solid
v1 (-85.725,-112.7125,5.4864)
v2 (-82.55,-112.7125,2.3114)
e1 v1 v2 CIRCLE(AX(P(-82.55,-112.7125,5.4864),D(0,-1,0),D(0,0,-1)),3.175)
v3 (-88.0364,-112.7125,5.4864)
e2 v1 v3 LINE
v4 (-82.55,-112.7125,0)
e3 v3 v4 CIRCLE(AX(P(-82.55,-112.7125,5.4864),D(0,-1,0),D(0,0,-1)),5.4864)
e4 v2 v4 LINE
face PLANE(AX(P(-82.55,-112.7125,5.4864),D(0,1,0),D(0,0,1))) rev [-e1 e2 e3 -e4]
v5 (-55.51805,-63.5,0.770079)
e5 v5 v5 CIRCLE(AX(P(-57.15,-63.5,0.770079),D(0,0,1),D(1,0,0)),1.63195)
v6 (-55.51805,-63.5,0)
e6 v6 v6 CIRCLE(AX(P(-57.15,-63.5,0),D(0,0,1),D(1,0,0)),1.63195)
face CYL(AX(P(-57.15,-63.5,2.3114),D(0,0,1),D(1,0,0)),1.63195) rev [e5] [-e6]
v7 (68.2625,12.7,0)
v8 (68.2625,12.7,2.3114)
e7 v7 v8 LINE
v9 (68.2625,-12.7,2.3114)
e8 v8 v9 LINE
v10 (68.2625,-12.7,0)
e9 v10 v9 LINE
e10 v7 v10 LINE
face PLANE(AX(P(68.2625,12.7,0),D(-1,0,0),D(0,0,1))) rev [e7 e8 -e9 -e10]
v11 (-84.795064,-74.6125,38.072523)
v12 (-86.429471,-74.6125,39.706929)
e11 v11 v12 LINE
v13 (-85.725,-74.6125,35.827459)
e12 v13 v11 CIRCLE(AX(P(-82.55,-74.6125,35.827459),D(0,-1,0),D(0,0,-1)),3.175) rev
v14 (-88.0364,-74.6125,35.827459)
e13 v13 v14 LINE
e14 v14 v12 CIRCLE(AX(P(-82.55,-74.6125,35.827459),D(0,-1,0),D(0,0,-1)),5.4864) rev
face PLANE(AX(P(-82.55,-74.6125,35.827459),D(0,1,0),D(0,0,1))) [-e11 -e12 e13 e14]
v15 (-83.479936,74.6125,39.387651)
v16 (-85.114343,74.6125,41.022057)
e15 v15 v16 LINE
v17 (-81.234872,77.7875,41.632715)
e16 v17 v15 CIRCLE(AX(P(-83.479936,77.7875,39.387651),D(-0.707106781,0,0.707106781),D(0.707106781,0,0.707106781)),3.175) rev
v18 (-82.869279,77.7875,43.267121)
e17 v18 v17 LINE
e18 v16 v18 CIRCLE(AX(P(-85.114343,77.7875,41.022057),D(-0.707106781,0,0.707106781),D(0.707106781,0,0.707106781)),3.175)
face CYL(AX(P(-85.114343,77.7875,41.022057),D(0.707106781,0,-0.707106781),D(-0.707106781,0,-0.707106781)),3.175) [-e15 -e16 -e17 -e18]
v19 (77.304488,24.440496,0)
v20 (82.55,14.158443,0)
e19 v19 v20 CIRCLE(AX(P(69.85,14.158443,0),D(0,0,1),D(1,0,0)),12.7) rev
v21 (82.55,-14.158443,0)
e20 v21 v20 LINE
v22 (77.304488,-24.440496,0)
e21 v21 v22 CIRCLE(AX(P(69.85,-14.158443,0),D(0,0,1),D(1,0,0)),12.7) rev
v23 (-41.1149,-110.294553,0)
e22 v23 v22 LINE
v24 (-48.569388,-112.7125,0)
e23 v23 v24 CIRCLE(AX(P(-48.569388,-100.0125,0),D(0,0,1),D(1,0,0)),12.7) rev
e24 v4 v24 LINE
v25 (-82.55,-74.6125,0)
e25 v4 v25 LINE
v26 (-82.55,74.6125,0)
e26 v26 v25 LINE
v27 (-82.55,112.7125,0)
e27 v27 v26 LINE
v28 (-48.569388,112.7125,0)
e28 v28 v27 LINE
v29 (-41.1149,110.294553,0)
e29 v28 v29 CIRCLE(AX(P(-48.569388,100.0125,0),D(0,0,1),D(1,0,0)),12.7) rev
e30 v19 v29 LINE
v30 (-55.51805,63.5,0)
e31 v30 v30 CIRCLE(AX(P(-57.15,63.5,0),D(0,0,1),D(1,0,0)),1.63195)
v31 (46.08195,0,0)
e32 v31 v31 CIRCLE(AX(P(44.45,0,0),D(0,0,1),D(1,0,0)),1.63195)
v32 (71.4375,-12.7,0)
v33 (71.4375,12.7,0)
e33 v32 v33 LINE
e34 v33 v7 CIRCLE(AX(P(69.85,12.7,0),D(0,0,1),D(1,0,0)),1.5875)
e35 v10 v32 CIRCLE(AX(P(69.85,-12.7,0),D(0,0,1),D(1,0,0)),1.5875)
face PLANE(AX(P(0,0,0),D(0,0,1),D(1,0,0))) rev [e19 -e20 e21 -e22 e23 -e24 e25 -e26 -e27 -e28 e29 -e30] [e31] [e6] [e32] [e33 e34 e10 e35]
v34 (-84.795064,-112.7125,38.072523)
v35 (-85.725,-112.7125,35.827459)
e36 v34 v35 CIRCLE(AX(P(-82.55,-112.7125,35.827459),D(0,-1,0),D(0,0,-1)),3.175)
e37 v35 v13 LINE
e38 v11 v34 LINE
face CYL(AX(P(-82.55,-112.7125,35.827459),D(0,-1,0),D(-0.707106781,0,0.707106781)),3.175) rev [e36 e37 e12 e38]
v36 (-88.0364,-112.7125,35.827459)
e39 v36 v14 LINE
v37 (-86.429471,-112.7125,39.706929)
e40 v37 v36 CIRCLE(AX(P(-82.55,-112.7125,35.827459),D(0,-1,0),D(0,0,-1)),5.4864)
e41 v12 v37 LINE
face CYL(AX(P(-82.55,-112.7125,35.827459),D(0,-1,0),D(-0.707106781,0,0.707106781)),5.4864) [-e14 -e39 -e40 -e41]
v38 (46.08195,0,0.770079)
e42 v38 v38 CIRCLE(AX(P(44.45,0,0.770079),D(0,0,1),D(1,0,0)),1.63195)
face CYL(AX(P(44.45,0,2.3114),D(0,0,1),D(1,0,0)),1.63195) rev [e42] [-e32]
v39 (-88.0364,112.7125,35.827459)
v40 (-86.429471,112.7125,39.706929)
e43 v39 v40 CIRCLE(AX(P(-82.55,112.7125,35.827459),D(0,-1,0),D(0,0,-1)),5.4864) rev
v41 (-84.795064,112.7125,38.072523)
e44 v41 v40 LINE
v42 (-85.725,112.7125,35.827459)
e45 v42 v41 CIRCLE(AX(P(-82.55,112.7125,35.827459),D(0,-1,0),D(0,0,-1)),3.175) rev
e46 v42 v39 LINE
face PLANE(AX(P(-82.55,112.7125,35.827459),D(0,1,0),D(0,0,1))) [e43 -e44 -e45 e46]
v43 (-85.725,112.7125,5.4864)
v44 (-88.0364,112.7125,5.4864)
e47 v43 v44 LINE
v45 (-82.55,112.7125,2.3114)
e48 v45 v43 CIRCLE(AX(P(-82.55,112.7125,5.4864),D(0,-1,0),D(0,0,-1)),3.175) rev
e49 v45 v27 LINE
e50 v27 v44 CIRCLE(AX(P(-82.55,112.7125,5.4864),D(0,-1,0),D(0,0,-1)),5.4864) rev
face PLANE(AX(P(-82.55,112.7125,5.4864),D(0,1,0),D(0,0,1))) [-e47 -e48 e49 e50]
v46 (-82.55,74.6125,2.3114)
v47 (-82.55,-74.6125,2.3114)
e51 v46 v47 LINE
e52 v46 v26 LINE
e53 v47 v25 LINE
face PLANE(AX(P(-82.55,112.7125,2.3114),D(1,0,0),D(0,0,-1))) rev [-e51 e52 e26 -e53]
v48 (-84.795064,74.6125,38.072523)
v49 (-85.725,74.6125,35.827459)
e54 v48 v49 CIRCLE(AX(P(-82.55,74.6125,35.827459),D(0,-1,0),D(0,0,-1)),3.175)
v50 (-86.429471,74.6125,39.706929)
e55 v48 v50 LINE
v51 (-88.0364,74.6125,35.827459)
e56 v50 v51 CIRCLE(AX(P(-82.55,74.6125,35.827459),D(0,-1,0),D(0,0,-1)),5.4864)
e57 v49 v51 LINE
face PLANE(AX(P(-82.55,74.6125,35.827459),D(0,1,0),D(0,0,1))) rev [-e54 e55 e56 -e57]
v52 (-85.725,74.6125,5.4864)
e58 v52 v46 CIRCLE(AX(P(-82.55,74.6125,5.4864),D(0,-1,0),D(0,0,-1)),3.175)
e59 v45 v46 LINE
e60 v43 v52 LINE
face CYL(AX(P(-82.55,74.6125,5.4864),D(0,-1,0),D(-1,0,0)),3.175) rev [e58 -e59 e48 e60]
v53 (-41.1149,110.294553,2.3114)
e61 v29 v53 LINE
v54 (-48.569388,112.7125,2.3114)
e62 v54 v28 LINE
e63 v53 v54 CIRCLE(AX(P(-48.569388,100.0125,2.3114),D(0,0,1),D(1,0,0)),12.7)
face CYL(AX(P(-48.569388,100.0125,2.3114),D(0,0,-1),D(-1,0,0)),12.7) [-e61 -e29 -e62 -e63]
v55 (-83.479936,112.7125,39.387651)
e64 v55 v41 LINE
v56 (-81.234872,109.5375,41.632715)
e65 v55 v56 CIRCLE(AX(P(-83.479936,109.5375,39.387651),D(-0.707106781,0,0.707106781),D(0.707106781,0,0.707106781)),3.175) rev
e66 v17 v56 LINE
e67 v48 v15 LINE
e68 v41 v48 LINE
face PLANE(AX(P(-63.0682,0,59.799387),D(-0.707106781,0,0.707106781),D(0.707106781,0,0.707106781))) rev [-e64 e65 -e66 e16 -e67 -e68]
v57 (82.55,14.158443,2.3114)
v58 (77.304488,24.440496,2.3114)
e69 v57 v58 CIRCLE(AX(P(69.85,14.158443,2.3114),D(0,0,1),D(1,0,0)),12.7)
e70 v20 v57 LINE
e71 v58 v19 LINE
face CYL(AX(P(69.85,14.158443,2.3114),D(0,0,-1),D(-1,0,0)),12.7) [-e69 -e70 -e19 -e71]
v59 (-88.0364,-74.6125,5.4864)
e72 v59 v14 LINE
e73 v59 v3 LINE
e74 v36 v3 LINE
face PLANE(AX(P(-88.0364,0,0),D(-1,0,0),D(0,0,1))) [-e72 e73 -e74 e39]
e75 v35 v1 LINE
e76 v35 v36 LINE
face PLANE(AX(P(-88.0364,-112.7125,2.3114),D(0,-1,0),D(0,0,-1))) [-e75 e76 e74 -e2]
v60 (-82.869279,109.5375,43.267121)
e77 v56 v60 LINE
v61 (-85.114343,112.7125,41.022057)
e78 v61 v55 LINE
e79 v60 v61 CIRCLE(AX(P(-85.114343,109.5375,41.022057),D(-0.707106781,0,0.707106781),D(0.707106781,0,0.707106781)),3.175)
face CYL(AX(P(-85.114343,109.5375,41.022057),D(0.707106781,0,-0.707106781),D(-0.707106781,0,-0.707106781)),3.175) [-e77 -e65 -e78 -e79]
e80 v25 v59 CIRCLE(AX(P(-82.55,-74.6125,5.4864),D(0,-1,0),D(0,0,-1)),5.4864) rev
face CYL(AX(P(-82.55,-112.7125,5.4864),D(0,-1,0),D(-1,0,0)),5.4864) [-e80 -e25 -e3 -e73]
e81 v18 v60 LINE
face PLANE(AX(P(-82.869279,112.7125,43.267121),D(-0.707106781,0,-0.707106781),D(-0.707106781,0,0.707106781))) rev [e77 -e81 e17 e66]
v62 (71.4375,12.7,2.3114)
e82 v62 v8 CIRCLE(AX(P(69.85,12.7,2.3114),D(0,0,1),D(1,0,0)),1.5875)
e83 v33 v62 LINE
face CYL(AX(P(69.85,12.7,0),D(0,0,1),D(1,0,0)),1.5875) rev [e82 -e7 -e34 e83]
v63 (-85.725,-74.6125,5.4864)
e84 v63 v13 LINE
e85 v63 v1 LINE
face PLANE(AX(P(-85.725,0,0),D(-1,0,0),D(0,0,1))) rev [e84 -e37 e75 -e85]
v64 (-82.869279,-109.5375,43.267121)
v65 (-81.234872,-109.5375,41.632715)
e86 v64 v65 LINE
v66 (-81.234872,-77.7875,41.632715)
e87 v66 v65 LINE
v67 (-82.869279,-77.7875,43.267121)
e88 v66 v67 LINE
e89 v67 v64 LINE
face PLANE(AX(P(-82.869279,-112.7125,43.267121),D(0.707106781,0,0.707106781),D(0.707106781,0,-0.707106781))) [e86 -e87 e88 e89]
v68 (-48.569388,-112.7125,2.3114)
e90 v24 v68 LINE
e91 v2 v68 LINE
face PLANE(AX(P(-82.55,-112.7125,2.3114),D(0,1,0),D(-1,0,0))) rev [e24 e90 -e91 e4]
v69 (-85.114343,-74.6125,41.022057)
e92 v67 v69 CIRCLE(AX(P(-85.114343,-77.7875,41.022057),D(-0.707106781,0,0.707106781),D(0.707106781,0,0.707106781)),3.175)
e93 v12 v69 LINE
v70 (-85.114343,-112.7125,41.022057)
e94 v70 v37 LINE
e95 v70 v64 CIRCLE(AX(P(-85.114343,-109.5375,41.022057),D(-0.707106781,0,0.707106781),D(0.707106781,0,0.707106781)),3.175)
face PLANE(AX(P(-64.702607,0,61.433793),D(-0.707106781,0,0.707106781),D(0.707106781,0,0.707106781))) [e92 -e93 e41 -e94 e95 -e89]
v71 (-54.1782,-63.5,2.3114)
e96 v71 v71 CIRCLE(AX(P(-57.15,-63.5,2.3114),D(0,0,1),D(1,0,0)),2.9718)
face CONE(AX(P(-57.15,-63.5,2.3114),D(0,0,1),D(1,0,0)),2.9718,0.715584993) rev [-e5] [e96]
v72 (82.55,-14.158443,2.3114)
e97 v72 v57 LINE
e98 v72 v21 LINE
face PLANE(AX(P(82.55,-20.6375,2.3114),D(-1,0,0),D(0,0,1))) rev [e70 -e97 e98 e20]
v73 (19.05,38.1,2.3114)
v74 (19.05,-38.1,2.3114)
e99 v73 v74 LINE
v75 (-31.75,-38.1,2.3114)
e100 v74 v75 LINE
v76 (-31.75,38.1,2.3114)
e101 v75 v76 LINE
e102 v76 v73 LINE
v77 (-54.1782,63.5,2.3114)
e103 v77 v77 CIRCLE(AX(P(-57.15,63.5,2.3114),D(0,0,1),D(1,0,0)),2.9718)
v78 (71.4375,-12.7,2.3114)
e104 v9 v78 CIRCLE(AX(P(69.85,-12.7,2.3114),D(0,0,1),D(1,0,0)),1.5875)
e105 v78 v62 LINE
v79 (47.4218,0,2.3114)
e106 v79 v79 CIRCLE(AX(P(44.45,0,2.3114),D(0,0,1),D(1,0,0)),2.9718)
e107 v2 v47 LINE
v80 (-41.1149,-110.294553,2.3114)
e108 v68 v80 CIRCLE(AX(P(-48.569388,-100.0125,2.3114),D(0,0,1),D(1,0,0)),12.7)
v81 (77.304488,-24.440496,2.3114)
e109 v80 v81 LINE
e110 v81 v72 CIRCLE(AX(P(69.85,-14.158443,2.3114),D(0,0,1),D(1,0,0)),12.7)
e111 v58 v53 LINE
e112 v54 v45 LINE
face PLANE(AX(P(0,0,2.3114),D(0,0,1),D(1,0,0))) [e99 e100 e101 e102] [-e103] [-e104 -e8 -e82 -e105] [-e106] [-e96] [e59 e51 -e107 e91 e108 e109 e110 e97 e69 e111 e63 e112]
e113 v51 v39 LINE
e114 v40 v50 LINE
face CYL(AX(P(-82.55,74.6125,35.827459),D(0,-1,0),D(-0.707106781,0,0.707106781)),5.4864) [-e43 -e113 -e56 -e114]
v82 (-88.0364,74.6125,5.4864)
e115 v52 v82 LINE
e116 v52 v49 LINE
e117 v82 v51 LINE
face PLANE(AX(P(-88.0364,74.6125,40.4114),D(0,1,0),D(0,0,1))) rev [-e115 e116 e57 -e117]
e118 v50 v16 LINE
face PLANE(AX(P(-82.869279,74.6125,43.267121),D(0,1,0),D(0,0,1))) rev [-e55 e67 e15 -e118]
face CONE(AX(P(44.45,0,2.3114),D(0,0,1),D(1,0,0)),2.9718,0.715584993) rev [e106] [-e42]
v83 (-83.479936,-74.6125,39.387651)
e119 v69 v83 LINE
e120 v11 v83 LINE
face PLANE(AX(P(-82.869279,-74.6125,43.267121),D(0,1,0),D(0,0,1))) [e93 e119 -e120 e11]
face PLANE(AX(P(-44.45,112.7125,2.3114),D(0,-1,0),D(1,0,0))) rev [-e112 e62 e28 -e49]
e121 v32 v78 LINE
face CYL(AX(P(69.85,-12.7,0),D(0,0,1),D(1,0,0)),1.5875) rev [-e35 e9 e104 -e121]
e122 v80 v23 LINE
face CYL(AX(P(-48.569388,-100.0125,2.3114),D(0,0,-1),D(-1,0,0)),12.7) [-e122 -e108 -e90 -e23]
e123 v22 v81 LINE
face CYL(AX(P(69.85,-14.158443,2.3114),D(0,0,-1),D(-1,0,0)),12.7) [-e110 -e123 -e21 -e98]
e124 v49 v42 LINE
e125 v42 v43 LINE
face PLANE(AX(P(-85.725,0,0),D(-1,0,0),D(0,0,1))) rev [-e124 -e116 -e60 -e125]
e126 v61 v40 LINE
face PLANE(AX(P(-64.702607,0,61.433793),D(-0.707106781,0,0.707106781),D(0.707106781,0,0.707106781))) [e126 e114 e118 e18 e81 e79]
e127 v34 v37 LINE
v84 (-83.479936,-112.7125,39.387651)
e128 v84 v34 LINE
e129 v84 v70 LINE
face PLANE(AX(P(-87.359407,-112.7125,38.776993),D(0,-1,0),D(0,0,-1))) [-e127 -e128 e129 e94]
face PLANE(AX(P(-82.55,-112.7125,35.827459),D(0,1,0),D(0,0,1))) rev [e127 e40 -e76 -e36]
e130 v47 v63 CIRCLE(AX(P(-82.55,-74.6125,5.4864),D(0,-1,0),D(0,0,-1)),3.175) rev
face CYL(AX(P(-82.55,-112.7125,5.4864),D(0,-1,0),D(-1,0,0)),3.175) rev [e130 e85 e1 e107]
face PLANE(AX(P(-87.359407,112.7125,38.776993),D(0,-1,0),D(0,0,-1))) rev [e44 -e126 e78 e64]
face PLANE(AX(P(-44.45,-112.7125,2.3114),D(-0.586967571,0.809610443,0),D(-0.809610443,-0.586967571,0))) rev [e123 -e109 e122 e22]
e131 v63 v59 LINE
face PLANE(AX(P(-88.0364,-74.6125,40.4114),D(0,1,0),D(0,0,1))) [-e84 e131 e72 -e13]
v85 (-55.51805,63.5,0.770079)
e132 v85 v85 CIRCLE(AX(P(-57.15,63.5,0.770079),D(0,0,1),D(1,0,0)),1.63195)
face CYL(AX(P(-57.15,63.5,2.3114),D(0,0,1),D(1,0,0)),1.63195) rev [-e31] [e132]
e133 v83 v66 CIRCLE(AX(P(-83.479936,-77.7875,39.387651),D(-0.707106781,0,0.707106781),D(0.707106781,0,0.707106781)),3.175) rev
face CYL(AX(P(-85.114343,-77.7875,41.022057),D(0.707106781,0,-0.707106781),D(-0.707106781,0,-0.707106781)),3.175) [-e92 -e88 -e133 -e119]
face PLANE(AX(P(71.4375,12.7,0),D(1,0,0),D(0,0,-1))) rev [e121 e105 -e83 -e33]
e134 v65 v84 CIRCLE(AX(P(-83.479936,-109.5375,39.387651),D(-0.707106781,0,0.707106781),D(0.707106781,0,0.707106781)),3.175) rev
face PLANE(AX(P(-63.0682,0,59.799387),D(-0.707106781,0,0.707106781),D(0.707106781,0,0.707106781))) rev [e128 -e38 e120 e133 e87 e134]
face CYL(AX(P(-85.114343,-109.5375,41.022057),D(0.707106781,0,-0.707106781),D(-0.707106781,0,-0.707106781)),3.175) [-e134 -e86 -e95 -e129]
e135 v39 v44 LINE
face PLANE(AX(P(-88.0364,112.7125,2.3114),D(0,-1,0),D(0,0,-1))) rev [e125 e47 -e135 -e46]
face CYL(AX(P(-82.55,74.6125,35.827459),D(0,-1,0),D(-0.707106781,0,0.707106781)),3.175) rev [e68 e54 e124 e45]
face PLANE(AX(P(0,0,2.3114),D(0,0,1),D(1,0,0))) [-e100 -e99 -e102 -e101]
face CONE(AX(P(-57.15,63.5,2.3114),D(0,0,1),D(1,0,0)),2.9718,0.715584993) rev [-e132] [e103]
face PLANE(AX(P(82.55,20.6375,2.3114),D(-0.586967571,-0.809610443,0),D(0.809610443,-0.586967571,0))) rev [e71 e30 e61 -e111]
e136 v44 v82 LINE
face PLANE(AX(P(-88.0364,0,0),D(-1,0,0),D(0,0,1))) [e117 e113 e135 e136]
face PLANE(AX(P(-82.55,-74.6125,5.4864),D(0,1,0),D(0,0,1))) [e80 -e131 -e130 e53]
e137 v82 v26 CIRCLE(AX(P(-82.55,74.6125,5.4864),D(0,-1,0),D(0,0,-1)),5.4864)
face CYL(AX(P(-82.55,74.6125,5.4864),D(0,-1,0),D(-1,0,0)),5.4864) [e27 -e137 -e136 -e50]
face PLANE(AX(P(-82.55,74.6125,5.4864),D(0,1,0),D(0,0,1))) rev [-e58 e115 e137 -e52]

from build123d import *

# Parameters (mm, degrees)
BASE_FLANGE1_DEPTH                    = 2.3114
EDGE_FLANGE2_DEPTH                    = 38.1
EDGE_FLANGE3_START                    = -112.7125
EDGE_FLANGE3_DEPTH                    = 38.1
EDGE_FLANGE3_2_DEPTH                  = 38.1
CUT_EXTRUDE1_DEPTH                    = 149.767894723
CUT_EXTRUDE1_DEPTH_BACK               = 149.767894723
BREAK_CORNER1_START                   = -89.191903794
BREAK_CORNER1_DEPTH                   = 2.3114
BREAK_CORNER2_DEPTH                   = 2.3114
F_30_0_1285_DIAMETER_HOLE1_AT_2_COUNT = 2
F_30_0_1285_DIAMETER_HOLE1_AT_2_PITCH = 127
F_30_0_1285_DIAMETER_HOLE1_AT_3_COUNT = 2
F_30_0_1285_DIAMETER_HOLE1_AT_3_PITCH = 119.811560377


# Read off the part's stored shape, not the designer's step: Edge-Flange3, Break-Corner1, Break-Corner2
# Sheet-metal steps are written as plain solids
with BuildPart() as part:
    # Sketch1 → Base-Flange1 (new body)
    with BuildSketch(Plane.XY):
        Polygon((-82.55, 112.7125), (-82.55, -112.7125), (-44.45, -112.7125), (82.55, -20.6375), (82.55, 20.6375), (-44.45, 112.7125), align=None)
    extrude(amount=BASE_FLANGE1_DEPTH)

    # Edge-Flange2 section (across the edge) → Edge-Flange2 (add)
    with BuildSketch(Plane(origin=(-85.725, -74.6125, 2.3114), x_dir=(1, 0, 0), z_dir=(0, -1, 0))):
        with BuildLine():
            Line((-2.3114, 3.175), (-2.3114, 38.1))
            Line((-2.3114, 38.1), (0, 38.1))
            Line((0, 38.1), (0, 3.175))
            ThreePointArc((0, 3.175), (0.92993597, 0.92993597), (3.175, 0))
            Line((3.175, 0), (3.175, -2.3114))
            ThreePointArc((3.175, -2.3114), (-0.704470644, -0.704470644), (-2.3114, 3.175))
        make_face()
    edge_flange2 = extrude(amount=EDGE_FLANGE2_DEPTH)

    # Mirror1: Edge-Flange2 across plane
    add(edge_flange2.mirror(Plane.ZX))

    # Edge-Flange3 outline → Edge-Flange3 (cut)
    with BuildSketch(Plane(origin=(0, 0, 0), x_dir=(1, 0, 0), z_dir=(0, 1, 0)).offset(EDGE_FLANGE3_START)):
        with BuildLine():
            Line((-85.725, -40.4114), (-86.429470644, -39.706929356))
            ThreePointArc((-86.429470644, -39.706929356), (-87.618772667, -37.927013095), (-88.0364, -35.827458711))
            Line((-88.0364, -35.827458711), (-88.0364, -40.4114))
            Line((-88.0364, -40.4114), (-85.725, -40.4114))
        make_face()
    edge_flange3 = extrude(amount=EDGE_FLANGE3_DEPTH, mode=Mode.SUBTRACT)

    # Edge-Flange3 2 outline → Edge-Flange3 2 (add)
    with BuildSketch(Plane(origin=(0, 0, 0), x_dir=(1, 0, 0), z_dir=(0, 1, 0)).offset(EDGE_FLANGE3_START)):
        with BuildLine():
            Line((-85.725, -35.827458711), (-85.725, -40.4114))
            Line((-85.725, -40.4114), (-82.869278554, -43.267121446))
            Line((-82.869278554, -43.267121446), (-81.234871939, -41.632714832))
            Line((-81.234871939, -41.632714832), (-84.79506403, -38.072522742))
            ThreePointArc((-84.79506403, -38.072522742), (-85.483317516, -37.042478609), (-85.725, -35.827458711))
        make_face()
    edge_flange3_2 = extrude(amount=EDGE_FLANGE3_2_DEPTH)

    # Mirror2: Edge-Flange3, Edge-Flange3 2 across plane
    add(edge_flange3.mirror(Plane.ZX), mode=Mode.SUBTRACT)
    add(edge_flange3_2.mirror(Plane.ZX))

    # Sketch15 → Cut-Extrude1 (cut, two sides: drawn at the far end of the back side and taken through both)
    with BuildSketch(Plane.XY.offset(2.3114).offset(-CUT_EXTRUDE1_DEPTH_BACK)):
        with BuildLine():
            Line((71.4375, 12.7), (71.4375, -12.7))
            ThreePointArc((71.4375, -12.7), (69.85, -14.2875), (68.2625, -12.7))
            Line((68.2625, -12.7), (68.2625, 12.7))
            ThreePointArc((68.2625, 12.7), (69.85, 14.2875), (71.4375, 12.7))
        make_face()
    extrude(amount=CUT_EXTRUDE1_DEPTH + CUT_EXTRUDE1_DEPTH_BACK, mode=Mode.SUBTRACT)

    # Break-Corner1 outline → Break-Corner1 (cut)
    with BuildSketch(Plane(origin=(0, 0, 0), x_dir=(0.707106781186541, 0, 0.707106781186554), z_dir=(0.707106781186554, 0, -0.707106781186541)).offset(BREAK_CORNER1_START)):
        with BuildLine():
            Line((-28.00295384, 74.6125), (-28.00295384, 77.7875))
            ThreePointArc((-28.00295384, 77.7875), (-28.93288981, 75.54243597), (-31.17795384, 74.6125))
            Line((-31.17795384, 74.6125), (-28.00295384, 74.6125))
        make_face()
        with BuildLine():
            ThreePointArc((-31.17795384, 112.7125), (-28.93288981, 111.78256403), (-28.00295384, 109.5375))
            Line((-28.00295384, 109.5375), (-28.00295384, 112.7125))
            Line((-28.00295384, 112.7125), (-31.17795384, 112.7125))
        make_face()
        with BuildLine():
            ThreePointArc((-31.17795384, -74.6125), (-28.93288981, -75.54243597), (-28.00295384, -77.7875))
            Line((-28.00295384, -77.7875), (-28.00295384, -74.6125))
            Line((-28.00295384, -74.6125), (-31.17795384, -74.6125))
        make_face()
        with BuildLine():
            ThreePointArc((-28.00295384, -109.5375), (-28.93288981, -111.78256403), (-31.17795384, -112.7125))
            Line((-31.17795384, -112.7125), (-28.00295384, -112.7125))
            Line((-28.00295384, -112.7125), (-28.00295384, -109.5375))
        make_face()
    extrude(amount=BREAK_CORNER1_DEPTH, mode=Mode.SUBTRACT)

    # Break-Corner2 outline → Break-Corner2 (cut)
    with BuildSketch(Plane.XY):
        with BuildLine():
            Line((-44.45, 112.7125), (-48.569388338, 112.7125))
            ThreePointArc((-48.569388338, 112.7125), (-44.650974655, 112.09289876), (-41.114900181, 110.294552631))
            Line((-41.114900181, 110.294552631), (-44.45, 112.7125))
        make_face()
        with BuildLine():
            Line((-44.45, -112.7125), (-41.114900181, -110.294552631))
            ThreePointArc((-41.114900181, -110.294552631), (-44.650974655, -112.09289876), (-48.569388338, -112.7125))
            Line((-48.569388338, -112.7125), (-44.45, -112.7125))
        make_face()
        with BuildLine():
            Line((82.55, -20.6375), (82.55, -14.158443455))
            ThreePointArc((82.55, -14.158443455), (81.16286877, -19.929838451), (77.304488158, -24.440496086))
            Line((77.304488158, -24.440496086), (82.55, -20.6375))
        make_face()
        with BuildLine():
            Line((82.55, 20.6375), (77.304488158, 24.440496086))
            ThreePointArc((77.304488158, 24.440496086), (81.16286877, 19.929838451), (82.55, 14.158443455))
            Line((82.55, 14.158443455), (82.55, 20.6375))
        make_face()
    extrude(amount=BREAK_CORNER2_DEPTH, mode=Mode.SUBTRACT)

    # Sketch18 → #30 (0.1285) Diameter Hole1 (revolve, cut)
    with BuildSketch(Plane(origin=(-57.15, -63.5, 2.3114), x_dir=(0, -1, 0), z_dir=(1, 0, 0))):
        Polygon((0, 0), (0, 2.3114), (1.63195, 2.3114), (1.63195, 1.54132111), (2.9718, 0), align=None)
    f_30_0_1285_diameter_hole1 = revolve(axis=Axis((-57.15, -63.5, 8.6614), (0, 0, -1)), mode=Mode.SUBTRACT)

    # #30 (0.1285) Diameter Hole1 at 2: #30 (0.1285) Diameter Hole1 ×2
    with Locations(*[(0, i * F_30_0_1285_DIAMETER_HOLE1_AT_2_PITCH, 0) for i in range(1, F_30_0_1285_DIAMETER_HOLE1_AT_2_COUNT)]):
        add(f_30_0_1285_diameter_hole1, mode=Mode.SUBTRACT)

    # #30 (0.1285) Diameter Hole1 at 3: #30 (0.1285) Diameter Hole1 ×2
    with Locations(*[Vector(0.8479983040050879, 0.52999894000318, 0) * (i * F_30_0_1285_DIAMETER_HOLE1_AT_3_PITCH) for i in range(1, F_30_0_1285_DIAMETER_HOLE1_AT_3_COUNT)]):
        add(f_30_0_1285_diameter_hole1, mode=Mode.SUBTRACT)


solid = part.part
